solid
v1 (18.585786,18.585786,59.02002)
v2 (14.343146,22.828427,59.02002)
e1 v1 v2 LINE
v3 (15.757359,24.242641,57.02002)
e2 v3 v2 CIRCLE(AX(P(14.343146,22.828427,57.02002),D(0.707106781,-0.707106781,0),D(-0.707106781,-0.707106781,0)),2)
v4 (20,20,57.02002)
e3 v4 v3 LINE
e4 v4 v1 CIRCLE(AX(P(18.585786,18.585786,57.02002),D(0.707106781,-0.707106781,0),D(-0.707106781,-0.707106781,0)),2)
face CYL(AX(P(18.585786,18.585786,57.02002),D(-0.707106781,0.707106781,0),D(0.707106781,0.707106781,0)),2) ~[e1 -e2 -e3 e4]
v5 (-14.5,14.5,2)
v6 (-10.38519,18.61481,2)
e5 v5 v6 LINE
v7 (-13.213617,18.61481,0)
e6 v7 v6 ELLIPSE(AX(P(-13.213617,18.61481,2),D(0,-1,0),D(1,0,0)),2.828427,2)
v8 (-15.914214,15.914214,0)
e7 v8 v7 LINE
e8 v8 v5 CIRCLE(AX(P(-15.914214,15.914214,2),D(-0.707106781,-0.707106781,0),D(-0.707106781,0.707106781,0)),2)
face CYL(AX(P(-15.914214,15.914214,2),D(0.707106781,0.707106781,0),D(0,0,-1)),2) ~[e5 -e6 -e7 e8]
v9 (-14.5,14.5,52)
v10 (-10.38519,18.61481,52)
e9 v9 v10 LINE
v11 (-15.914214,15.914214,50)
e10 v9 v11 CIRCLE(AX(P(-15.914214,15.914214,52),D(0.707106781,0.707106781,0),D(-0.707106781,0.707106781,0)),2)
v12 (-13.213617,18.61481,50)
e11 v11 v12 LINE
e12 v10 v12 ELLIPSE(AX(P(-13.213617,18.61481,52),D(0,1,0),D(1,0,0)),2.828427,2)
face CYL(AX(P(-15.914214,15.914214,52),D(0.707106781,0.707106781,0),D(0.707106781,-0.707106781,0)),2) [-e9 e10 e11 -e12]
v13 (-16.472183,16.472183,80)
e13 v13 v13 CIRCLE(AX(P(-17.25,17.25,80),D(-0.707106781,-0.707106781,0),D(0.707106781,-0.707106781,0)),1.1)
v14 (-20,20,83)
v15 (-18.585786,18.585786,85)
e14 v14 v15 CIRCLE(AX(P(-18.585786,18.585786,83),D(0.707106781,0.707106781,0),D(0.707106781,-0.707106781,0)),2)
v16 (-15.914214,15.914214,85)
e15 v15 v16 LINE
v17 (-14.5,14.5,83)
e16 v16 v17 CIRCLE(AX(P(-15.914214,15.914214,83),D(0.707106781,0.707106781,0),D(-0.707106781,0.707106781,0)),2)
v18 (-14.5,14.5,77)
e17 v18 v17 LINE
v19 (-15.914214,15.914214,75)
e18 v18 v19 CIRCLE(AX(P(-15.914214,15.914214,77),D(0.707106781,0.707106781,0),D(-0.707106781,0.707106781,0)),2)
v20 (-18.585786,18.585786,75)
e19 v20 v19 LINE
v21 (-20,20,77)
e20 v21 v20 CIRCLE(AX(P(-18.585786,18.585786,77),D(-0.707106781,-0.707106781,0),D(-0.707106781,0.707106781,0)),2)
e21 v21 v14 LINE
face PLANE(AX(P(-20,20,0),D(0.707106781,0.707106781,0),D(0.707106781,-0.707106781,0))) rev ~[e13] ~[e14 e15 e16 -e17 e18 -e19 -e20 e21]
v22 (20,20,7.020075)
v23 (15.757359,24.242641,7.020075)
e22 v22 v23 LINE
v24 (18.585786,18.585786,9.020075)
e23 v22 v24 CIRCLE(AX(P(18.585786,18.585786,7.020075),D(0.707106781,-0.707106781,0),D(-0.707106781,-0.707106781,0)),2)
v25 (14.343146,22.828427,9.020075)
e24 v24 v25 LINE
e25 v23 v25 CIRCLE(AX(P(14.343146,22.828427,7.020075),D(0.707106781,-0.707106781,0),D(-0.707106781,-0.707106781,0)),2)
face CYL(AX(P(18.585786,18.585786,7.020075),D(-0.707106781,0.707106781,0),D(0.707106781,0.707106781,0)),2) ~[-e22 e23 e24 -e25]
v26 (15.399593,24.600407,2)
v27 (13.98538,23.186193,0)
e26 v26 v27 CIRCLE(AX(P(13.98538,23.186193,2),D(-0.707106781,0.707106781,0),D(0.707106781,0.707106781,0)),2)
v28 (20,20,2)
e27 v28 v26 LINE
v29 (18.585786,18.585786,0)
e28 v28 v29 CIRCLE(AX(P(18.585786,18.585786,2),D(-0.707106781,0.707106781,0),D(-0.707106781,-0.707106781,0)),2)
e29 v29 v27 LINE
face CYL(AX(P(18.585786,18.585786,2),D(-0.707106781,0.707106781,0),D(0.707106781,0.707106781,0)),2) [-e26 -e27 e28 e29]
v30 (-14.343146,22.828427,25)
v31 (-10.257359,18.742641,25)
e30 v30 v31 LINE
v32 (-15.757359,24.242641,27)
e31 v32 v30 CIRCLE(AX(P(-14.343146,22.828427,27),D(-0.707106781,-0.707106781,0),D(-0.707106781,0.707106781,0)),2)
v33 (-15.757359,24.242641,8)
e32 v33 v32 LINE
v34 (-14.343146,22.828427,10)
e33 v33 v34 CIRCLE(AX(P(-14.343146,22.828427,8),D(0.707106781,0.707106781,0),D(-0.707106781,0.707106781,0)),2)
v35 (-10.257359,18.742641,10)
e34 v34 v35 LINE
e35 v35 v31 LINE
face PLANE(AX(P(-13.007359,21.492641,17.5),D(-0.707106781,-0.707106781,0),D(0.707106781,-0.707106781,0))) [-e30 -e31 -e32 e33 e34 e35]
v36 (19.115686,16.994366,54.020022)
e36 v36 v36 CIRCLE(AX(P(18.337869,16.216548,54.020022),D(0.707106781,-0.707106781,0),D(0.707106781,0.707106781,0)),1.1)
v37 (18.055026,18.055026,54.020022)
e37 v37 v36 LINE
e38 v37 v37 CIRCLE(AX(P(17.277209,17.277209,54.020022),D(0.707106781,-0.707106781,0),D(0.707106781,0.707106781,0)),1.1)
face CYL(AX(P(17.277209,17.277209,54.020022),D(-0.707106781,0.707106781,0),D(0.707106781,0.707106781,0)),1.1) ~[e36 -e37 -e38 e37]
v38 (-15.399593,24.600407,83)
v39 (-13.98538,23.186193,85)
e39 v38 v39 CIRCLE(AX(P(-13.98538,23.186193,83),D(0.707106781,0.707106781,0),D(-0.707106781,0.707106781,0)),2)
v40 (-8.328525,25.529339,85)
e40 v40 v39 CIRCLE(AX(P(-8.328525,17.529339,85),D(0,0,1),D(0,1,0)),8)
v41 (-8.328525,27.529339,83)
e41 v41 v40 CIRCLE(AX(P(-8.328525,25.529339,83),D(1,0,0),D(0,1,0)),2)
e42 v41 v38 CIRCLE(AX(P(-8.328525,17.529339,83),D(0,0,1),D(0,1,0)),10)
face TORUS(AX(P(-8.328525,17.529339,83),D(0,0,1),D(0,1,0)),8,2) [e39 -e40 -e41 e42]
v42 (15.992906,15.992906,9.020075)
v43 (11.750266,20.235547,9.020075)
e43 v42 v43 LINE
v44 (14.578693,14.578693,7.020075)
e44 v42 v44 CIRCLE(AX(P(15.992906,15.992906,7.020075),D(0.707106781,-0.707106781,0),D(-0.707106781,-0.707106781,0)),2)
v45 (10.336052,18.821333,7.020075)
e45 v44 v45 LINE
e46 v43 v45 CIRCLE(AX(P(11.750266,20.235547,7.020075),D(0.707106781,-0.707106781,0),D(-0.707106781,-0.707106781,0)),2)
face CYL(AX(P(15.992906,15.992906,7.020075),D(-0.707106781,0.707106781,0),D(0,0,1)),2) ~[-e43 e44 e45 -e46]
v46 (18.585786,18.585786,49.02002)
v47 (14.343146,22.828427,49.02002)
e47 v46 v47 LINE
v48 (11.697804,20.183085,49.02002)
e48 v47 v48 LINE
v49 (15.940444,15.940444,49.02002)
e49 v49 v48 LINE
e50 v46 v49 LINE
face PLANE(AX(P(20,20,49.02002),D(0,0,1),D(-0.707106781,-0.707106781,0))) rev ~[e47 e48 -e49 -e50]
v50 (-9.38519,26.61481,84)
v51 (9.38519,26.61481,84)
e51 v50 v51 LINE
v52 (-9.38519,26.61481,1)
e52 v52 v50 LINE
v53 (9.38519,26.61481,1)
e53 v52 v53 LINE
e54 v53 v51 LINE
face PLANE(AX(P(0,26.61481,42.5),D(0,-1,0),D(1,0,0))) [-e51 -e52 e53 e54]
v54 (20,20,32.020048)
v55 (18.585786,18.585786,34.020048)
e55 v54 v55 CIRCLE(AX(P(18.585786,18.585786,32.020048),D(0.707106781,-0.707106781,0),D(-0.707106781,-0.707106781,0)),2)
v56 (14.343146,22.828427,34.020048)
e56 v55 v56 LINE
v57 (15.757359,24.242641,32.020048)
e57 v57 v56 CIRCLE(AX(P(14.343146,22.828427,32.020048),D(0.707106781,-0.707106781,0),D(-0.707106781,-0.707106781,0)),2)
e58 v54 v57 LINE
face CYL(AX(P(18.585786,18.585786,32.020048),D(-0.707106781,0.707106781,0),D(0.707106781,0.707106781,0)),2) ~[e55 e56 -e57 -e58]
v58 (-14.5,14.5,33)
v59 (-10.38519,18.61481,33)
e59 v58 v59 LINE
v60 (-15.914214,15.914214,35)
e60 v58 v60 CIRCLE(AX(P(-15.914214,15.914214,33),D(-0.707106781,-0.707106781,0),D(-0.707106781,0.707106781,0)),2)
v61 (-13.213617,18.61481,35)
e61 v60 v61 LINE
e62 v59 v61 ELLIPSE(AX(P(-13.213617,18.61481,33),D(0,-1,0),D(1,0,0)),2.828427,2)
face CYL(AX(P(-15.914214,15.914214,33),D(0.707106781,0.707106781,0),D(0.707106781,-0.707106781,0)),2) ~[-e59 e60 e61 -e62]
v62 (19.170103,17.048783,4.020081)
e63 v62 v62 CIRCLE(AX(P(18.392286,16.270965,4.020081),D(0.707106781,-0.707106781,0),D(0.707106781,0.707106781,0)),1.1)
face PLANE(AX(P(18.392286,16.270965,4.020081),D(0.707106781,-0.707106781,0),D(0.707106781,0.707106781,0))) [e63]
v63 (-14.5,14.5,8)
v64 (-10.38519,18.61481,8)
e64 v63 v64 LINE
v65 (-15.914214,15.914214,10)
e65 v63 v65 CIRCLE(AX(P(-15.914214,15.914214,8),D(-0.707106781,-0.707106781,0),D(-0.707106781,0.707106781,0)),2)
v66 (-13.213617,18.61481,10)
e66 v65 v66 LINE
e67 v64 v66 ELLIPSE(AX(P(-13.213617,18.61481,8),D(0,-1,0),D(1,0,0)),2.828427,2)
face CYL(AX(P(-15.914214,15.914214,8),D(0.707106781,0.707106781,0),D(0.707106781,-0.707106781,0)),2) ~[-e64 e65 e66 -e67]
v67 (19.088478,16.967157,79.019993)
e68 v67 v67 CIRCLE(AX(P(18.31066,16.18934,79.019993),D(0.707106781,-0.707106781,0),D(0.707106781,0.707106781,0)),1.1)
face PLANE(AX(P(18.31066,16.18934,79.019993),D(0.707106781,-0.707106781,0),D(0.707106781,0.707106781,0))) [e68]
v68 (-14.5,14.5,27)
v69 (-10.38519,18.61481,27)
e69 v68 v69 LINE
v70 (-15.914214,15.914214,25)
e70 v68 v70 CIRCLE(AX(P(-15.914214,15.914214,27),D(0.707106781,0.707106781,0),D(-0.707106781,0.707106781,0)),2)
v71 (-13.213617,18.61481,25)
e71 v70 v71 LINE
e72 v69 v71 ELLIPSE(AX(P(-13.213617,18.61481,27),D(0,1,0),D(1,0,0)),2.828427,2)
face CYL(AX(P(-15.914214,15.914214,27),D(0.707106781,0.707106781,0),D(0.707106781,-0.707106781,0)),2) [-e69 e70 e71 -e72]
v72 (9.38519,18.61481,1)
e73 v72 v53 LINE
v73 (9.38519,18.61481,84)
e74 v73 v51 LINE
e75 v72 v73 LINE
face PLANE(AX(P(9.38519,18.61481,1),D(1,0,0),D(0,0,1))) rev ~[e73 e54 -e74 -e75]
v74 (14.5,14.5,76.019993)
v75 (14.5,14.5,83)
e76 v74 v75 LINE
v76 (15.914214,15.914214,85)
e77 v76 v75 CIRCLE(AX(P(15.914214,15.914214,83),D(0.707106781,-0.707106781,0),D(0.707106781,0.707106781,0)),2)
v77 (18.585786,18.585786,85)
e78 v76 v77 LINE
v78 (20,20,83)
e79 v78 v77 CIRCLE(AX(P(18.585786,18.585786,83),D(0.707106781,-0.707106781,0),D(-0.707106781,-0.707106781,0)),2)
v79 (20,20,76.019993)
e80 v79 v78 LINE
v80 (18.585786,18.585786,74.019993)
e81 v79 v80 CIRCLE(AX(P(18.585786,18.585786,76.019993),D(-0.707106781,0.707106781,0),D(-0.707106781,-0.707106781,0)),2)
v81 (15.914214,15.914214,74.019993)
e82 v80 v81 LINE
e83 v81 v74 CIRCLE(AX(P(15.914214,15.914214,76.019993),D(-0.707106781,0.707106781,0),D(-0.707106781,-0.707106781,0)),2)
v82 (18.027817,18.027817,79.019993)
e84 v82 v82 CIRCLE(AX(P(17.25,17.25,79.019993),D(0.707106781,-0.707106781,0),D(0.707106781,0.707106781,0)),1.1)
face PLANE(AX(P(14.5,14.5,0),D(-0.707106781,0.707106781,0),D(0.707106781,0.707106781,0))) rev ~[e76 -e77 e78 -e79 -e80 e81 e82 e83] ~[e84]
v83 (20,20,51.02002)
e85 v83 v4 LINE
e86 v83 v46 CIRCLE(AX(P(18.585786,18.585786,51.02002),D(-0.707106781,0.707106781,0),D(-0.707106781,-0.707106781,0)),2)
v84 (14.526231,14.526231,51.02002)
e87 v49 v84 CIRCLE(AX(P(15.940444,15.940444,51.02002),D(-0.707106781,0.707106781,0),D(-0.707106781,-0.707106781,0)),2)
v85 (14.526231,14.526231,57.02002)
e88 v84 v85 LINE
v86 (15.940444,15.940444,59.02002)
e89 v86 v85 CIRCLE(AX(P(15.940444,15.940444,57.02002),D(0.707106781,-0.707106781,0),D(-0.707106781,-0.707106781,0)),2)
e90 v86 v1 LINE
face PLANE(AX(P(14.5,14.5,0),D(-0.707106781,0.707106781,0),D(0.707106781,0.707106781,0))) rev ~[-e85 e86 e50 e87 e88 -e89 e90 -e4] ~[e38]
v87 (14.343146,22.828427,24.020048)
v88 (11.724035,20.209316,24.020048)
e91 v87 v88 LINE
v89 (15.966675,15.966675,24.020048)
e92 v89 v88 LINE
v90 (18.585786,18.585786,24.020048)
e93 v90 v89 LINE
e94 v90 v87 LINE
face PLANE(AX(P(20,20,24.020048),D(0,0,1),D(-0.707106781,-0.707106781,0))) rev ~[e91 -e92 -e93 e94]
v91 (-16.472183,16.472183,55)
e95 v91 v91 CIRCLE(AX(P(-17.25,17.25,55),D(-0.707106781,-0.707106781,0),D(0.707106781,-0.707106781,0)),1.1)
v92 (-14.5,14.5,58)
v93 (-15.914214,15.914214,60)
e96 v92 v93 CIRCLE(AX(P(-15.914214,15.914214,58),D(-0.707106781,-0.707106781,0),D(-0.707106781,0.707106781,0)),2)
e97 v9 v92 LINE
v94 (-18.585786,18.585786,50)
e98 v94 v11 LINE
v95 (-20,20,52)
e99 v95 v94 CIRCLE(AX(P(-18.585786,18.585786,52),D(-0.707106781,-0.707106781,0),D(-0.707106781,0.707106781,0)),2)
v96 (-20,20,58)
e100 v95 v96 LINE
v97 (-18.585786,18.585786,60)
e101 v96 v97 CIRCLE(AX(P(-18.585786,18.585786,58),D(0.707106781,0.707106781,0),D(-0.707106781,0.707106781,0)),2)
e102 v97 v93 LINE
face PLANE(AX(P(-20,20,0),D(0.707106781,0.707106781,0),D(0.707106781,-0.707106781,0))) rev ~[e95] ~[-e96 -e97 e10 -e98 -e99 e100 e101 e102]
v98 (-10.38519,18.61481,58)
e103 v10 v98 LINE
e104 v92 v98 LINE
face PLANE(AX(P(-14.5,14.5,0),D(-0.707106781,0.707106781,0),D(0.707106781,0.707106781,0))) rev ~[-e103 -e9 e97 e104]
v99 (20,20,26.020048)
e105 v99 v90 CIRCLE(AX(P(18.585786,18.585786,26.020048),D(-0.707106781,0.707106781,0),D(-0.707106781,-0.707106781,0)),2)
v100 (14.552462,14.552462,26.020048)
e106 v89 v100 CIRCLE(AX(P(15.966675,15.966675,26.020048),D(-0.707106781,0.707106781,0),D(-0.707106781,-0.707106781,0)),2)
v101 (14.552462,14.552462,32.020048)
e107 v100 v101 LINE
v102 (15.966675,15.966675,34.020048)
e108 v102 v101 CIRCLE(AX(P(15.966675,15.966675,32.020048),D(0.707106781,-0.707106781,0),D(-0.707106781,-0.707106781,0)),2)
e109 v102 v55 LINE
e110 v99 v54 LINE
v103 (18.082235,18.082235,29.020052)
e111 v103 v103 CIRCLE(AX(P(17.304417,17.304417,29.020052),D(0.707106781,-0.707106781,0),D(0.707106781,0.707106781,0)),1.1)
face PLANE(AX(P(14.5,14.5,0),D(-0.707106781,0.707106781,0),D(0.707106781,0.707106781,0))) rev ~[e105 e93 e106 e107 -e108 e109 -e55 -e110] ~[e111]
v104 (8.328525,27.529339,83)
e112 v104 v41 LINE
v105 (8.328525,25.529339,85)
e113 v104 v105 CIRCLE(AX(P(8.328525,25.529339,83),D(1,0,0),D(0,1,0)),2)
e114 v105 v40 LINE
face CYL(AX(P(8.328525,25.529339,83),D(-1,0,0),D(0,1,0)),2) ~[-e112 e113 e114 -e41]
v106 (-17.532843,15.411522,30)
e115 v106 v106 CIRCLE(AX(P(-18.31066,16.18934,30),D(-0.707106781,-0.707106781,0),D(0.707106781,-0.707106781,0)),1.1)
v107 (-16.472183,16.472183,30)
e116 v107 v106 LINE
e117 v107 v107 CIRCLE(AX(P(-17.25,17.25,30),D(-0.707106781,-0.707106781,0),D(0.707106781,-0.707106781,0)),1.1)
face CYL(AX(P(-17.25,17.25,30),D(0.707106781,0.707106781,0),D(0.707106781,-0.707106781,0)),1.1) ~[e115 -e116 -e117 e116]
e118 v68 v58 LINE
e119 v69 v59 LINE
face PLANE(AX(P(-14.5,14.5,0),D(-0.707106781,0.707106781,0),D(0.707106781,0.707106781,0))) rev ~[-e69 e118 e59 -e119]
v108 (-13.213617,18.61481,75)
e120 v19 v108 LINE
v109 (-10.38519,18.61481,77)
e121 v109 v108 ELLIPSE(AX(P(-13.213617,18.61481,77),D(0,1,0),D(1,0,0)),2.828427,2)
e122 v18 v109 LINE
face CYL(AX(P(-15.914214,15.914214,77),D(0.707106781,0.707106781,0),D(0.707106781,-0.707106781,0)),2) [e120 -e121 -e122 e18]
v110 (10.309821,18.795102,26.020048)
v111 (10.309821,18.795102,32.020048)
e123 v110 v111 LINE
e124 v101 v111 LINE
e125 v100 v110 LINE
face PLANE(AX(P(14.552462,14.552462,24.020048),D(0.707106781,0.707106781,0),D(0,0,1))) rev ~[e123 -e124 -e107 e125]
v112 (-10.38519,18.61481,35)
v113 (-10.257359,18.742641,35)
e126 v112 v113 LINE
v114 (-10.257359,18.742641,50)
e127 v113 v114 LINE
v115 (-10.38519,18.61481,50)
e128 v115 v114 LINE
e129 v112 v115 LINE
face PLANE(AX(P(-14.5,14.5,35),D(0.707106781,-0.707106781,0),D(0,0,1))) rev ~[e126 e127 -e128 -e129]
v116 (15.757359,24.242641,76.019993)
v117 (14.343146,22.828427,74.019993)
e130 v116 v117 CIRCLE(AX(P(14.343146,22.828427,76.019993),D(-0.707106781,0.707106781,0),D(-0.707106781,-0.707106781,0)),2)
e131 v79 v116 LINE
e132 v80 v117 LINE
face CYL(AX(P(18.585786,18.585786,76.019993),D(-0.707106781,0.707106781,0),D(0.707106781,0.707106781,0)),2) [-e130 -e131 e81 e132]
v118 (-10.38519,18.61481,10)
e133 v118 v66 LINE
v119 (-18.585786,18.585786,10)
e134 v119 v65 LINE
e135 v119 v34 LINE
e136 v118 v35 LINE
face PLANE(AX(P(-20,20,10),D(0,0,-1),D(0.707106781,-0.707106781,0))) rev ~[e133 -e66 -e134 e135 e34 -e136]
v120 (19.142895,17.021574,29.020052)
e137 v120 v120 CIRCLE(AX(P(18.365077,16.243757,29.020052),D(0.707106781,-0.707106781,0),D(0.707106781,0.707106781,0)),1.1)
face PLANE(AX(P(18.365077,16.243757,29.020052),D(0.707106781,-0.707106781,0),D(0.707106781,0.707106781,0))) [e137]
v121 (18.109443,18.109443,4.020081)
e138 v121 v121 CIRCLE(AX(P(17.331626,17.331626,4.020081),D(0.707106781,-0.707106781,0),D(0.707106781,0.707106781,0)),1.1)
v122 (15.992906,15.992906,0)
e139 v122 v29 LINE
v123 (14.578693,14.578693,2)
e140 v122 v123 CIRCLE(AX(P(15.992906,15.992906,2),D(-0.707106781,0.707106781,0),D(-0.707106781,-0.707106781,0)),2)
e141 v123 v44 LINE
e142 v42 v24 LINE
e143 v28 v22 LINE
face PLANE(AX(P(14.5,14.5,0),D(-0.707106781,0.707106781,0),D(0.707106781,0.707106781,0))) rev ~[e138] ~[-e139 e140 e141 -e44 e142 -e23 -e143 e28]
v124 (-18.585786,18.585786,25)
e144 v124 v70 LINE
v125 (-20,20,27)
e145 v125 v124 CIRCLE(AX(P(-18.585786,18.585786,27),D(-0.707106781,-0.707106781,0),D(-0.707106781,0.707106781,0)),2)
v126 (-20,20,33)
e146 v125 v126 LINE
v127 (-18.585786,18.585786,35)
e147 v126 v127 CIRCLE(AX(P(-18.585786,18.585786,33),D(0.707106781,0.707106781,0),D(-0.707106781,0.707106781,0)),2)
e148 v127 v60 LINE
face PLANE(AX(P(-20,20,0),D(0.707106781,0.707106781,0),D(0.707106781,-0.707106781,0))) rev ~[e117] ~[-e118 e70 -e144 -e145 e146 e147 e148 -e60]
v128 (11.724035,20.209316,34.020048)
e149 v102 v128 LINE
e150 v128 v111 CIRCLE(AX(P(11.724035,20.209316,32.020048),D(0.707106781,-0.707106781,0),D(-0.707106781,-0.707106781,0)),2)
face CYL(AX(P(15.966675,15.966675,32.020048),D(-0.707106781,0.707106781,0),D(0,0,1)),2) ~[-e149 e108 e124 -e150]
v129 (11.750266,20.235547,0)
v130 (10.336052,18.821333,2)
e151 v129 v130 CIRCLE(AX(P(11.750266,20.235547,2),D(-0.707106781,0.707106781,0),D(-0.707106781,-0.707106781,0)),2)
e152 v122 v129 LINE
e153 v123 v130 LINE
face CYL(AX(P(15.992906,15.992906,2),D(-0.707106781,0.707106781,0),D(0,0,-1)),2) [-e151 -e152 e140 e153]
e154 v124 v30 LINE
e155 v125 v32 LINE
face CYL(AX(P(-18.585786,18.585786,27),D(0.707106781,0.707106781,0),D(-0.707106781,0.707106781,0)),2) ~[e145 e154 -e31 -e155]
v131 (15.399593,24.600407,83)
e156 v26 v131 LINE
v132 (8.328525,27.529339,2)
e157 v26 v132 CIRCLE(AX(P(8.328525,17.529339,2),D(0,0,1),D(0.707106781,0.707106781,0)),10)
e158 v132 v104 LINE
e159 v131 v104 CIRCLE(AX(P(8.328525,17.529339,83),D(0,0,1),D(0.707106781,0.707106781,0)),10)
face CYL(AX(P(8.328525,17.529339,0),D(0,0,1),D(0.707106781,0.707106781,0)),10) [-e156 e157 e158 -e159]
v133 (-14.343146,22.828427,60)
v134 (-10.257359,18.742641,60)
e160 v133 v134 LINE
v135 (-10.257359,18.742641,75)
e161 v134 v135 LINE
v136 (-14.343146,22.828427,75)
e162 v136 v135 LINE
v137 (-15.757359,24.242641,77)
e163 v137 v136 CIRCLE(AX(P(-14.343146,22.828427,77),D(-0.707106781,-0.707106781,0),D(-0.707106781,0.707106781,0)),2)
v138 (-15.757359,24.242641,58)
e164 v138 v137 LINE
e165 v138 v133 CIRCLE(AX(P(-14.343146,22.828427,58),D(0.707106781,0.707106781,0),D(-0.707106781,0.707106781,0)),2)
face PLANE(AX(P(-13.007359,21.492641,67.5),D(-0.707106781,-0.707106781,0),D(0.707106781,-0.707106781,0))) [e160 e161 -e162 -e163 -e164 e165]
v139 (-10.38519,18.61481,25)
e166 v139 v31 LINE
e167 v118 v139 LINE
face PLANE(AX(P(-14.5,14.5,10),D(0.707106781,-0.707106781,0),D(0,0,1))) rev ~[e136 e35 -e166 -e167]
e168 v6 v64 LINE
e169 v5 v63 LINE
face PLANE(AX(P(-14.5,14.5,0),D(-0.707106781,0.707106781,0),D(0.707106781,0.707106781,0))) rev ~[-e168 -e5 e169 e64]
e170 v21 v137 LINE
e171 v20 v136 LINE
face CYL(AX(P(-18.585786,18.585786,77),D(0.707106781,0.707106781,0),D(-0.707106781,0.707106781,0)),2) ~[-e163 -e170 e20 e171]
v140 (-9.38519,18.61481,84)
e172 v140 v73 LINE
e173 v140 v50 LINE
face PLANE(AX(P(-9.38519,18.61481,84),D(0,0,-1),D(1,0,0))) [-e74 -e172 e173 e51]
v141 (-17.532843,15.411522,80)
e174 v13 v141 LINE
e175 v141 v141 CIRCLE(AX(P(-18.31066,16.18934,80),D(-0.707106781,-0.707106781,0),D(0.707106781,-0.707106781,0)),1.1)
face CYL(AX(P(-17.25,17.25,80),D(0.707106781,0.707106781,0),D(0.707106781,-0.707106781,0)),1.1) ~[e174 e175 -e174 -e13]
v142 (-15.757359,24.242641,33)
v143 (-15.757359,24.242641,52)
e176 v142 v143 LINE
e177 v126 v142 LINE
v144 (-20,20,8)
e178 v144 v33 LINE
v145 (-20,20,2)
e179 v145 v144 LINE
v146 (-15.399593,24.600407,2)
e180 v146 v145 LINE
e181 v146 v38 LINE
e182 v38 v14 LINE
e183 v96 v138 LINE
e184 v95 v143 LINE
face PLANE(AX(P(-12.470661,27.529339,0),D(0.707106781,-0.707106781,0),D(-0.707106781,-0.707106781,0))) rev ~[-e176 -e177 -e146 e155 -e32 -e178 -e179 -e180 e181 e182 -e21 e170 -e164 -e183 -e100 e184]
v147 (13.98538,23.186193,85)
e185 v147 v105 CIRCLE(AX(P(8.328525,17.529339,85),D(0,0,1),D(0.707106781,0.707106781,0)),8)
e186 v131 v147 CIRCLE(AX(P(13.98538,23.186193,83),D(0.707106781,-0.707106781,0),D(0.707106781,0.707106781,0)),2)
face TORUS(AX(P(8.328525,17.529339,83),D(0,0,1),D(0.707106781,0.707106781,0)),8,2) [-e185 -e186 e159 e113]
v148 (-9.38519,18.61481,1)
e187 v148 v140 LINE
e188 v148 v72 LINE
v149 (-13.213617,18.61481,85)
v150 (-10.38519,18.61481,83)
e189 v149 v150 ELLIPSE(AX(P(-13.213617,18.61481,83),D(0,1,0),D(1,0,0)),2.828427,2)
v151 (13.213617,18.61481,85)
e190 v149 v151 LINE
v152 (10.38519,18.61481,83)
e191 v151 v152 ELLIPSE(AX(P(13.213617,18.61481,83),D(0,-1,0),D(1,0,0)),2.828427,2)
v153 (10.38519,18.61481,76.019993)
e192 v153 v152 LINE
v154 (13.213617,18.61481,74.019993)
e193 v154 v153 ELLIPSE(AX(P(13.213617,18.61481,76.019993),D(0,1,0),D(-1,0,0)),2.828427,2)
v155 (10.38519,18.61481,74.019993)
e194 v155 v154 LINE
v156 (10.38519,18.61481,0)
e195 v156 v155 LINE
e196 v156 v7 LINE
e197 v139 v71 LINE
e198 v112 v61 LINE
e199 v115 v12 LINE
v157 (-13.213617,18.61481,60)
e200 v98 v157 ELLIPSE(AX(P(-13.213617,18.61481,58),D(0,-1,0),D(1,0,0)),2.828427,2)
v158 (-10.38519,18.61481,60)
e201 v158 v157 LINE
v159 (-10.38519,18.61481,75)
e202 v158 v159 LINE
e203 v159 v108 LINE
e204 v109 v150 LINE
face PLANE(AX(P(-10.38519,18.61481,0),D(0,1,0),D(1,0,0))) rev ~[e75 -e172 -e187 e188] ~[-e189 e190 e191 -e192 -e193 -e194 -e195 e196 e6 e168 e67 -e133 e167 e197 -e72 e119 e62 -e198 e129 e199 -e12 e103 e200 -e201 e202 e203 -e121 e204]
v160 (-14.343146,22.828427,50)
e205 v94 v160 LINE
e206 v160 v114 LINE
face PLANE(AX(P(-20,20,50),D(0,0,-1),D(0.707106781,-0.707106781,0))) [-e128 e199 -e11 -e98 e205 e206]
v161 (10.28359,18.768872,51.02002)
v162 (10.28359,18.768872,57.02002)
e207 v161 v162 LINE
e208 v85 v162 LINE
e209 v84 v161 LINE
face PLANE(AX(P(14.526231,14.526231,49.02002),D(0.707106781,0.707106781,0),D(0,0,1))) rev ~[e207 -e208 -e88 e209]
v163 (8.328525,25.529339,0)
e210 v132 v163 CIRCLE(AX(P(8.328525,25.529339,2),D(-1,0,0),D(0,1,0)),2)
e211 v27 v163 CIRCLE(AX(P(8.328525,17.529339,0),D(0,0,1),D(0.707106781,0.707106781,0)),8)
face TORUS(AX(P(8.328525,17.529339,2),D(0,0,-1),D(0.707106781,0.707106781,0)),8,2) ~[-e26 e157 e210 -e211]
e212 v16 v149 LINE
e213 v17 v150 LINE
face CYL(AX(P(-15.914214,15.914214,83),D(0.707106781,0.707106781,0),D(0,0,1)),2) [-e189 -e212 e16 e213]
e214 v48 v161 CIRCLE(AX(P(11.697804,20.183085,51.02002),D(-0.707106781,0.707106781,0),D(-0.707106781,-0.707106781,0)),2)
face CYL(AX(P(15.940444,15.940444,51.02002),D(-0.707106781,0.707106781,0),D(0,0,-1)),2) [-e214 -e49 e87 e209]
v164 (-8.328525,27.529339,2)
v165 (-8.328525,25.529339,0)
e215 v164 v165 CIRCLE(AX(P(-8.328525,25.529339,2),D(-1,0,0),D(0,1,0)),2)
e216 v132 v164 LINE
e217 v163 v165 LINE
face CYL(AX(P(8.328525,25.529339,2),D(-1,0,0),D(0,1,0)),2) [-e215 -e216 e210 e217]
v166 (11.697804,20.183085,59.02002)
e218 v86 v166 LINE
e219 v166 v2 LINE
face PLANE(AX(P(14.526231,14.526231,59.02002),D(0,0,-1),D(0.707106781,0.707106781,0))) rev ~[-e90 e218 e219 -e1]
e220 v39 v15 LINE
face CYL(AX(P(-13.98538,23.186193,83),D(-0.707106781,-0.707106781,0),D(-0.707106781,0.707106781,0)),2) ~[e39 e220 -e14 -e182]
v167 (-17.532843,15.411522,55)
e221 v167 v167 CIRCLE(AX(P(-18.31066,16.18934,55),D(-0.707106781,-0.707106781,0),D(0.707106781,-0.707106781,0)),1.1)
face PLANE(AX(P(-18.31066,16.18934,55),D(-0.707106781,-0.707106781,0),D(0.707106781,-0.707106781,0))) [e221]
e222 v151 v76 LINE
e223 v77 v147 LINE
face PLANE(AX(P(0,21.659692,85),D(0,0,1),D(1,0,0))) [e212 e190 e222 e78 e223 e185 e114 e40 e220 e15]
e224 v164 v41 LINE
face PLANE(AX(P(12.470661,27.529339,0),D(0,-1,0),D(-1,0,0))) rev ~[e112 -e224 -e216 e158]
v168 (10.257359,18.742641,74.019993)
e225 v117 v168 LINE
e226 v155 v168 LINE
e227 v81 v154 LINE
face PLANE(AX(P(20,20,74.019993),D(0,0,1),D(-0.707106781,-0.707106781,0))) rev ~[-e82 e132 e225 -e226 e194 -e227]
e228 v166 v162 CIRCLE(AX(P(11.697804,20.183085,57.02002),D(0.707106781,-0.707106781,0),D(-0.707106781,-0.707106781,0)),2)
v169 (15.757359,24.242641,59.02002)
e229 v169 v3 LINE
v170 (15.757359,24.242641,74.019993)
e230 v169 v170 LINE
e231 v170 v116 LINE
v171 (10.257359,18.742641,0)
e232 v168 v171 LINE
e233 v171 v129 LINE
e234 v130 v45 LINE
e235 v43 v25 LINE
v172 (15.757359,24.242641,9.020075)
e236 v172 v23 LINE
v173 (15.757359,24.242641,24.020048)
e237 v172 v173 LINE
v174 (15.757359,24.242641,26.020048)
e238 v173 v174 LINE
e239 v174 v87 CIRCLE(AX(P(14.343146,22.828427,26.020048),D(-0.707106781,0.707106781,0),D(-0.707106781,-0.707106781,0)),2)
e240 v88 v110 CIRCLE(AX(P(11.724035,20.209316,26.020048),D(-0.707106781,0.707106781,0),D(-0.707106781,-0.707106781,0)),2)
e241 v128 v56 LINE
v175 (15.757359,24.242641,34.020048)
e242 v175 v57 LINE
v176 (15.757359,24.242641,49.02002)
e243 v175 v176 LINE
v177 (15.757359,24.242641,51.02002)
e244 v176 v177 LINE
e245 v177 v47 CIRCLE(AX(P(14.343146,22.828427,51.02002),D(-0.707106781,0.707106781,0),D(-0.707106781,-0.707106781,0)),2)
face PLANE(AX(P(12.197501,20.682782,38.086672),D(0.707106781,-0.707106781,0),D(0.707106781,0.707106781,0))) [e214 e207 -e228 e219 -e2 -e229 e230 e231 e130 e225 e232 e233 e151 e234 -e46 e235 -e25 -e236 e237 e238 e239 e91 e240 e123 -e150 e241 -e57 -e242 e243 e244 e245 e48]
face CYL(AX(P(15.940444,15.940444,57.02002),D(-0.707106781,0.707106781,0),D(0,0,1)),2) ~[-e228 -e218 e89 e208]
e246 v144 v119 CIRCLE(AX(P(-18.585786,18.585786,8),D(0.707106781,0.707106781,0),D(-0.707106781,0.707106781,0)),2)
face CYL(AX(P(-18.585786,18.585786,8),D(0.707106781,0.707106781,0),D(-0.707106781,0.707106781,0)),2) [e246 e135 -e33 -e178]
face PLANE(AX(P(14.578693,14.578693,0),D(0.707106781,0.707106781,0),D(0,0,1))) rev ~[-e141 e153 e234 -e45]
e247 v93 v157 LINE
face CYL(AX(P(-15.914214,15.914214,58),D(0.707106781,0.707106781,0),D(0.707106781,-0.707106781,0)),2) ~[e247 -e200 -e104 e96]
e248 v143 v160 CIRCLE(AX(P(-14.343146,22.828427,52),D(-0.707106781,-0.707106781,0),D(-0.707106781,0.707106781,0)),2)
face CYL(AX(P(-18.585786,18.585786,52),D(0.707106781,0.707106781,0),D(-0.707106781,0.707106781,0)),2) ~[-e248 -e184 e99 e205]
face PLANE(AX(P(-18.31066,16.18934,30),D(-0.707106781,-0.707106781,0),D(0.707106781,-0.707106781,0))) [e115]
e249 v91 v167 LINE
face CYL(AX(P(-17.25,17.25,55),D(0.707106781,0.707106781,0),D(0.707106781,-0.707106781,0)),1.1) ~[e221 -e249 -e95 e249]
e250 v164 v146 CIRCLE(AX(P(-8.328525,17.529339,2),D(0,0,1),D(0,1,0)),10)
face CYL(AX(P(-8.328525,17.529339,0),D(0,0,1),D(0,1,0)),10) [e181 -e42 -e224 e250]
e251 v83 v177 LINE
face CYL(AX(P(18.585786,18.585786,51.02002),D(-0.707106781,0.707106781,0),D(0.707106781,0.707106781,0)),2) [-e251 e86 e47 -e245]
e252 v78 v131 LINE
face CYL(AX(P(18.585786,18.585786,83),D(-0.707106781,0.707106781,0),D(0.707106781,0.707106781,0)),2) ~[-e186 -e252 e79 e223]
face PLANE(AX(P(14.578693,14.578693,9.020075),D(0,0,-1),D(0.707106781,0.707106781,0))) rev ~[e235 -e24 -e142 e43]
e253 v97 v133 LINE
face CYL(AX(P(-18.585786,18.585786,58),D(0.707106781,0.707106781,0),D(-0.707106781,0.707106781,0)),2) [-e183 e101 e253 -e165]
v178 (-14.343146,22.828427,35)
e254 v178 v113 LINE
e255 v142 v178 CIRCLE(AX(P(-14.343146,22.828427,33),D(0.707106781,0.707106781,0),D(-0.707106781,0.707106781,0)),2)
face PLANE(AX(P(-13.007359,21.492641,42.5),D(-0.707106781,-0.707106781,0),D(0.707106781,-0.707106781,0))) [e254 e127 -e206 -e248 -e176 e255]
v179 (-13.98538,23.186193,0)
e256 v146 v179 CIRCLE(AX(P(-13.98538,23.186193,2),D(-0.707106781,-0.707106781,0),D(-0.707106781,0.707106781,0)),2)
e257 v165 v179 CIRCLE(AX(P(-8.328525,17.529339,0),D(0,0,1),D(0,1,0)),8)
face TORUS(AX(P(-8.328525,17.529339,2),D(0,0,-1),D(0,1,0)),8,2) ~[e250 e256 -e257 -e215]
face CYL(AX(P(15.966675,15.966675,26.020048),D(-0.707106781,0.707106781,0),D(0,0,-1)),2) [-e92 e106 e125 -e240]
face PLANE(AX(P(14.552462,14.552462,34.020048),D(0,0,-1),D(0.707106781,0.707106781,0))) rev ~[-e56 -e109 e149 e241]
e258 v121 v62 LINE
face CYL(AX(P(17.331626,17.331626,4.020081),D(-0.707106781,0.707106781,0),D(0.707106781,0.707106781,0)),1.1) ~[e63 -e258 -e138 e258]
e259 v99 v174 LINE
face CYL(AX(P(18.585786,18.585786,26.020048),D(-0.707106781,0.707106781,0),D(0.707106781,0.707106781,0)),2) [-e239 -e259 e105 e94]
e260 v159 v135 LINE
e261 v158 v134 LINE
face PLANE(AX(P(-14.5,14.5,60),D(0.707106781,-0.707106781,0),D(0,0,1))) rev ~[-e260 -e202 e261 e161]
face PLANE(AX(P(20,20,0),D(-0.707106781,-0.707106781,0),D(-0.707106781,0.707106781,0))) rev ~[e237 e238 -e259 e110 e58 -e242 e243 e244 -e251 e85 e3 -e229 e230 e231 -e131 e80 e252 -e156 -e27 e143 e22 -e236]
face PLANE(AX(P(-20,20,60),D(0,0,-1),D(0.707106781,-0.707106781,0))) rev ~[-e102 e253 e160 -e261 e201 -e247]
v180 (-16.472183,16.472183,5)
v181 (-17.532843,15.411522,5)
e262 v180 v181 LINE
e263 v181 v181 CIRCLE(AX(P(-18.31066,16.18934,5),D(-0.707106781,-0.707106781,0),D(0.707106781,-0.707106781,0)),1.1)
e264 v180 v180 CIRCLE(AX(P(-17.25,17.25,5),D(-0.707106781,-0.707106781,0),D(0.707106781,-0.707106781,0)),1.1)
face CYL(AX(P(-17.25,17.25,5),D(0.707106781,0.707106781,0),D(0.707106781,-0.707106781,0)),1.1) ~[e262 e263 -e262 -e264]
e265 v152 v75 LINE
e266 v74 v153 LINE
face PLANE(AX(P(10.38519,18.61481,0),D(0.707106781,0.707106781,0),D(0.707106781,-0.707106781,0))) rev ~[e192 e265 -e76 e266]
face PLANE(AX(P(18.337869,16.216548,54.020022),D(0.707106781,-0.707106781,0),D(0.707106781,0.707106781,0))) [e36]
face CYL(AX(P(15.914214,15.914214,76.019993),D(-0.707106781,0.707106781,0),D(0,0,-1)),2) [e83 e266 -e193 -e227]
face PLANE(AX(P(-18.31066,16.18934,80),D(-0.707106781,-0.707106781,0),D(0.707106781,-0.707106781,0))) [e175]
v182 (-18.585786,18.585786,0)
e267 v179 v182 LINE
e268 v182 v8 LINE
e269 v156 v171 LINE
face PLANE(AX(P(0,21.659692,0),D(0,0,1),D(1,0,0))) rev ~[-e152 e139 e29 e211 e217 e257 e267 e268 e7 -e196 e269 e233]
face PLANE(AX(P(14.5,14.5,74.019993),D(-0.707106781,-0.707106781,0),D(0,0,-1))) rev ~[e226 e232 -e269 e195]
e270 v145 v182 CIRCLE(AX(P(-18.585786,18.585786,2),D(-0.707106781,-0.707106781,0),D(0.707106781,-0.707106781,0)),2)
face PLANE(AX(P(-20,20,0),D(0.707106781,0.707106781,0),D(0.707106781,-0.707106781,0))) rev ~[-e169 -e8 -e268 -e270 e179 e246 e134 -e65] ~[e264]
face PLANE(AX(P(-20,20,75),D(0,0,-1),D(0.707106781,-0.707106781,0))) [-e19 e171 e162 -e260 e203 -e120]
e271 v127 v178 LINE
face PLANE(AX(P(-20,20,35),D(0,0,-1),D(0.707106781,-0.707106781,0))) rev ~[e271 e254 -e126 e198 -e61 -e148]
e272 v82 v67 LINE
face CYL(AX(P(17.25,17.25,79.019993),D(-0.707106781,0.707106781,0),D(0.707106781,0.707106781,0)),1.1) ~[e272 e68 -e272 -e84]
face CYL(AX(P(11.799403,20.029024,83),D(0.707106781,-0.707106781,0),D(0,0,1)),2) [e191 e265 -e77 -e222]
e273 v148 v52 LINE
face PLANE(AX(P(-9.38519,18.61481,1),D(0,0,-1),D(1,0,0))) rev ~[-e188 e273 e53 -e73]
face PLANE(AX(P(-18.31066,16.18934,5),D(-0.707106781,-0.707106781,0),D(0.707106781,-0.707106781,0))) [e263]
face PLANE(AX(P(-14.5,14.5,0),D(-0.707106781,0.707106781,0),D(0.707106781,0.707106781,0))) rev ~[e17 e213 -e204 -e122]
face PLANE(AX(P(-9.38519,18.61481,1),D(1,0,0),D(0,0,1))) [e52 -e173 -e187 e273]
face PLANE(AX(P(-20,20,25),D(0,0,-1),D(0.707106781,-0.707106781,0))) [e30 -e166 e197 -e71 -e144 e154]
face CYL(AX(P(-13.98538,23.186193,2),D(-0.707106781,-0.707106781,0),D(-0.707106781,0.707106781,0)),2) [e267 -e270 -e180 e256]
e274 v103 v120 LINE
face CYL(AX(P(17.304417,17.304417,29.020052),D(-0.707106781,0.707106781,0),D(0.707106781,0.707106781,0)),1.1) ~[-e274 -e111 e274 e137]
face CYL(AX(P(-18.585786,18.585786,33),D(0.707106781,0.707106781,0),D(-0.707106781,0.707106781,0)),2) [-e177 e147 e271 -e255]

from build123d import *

# Parameters (mm, degrees)
F1_DEPTH  = 85
F2_R      = 10
F4_DEPTH  = 6
F5_R      = 2
F6_W      = 7.7781745931
F6_H      = 15
F7_DEPTH  = 6
F8_R      = 2
F6_R      = 1.1
F9_DEPTH  = 1.5
F3_R      = 1.1
F10_DEPTH = 1.5
F11_W     = 18.7703792453
F11_H     = 83
F12_DEPTH = 8


with BuildPart() as f1:
    # F0 (on Top) → F1 (new body)
    with BuildSketch(Plane.XY):
        Polygon((-20, 20), (-14.5, 14.5), (-10.3851896226, 18.6148103774), (0, 18.6148103774), (10.3851896226, 18.6148103774), (14.5, 14.5), (20, 20), (12.470660899, 27.529339101), (0, 27.529339101), (-12.470660899, 27.529339101), align=None)
    extrude(amount=F1_DEPTH)

    # F2
    f2_edges = [f1.edges().sort_by_distance(p)[0] for p in [
        (-12.470661, 27.529339, 42.5),
        (12.470661, 27.529339, 42.5),
    ]]
    fillet(f2_edges, radius=F2_R)

    # F3 (on face) → F4 (cut)
    with BuildSketch(Plane(origin=(0, 0, 0), x_dir=(0.7071067812, 0.7071067812, 0), z_dir=(0.7071067812, -0.7071067812, 0))):
        Polygon((28.2842712475, 59.0200200677), (28.2842712475, 74.0199925453), (20.5060966544, 74.0199925453), (20.5060966544, 0), (20.6173848753, 0), (20.6173848753, 9.0200751125), (28.2842712475, 9.0200751125), (28.2842712475, 24.0200475901), (20.5802888017, 24.0200475901), (20.5802888017, 34.0200475901), (28.2842712475, 34.0200475901), (28.2842712475, 49.0200200677), (20.543192728, 49.0200200677), (20.543192728, 59.0200200677), align=None)
    extrude(amount=-F4_DEPTH, mode=Mode.SUBTRACT)

    # F5
    f5_edges = [f1.edges().sort_by_distance(p)[0] for p in [
        (17.87868, 22.12132, 74.019993),
        (17.87868, 22.12132, 49.02002),
        (17.87868, 22.12132, 24.020048),
        (17.699797, 22.300203, 0),
        (12.457372, 16.700013, 0),
        (12.431141, 16.673782, 24.020048),
        (12.404911, 16.647551, 49.02002),
        (17.699797, 22.300203, 85),
        (12.442595, 16.557405, 85),
        (17.87868, 22.12132, 59.02002),
        (12.404911, 16.647551, 59.02002),
        (17.87868, 22.12132, 34.020048),
        (12.431141, 16.673782, 34.020048),
        (17.87868, 22.12132, 9.020075),
        (12.457372, 16.700013, 9.020075),
        (-17.699797, 22.300203, 0),
        (-17.699797, 22.300203, 85),
        (-12.15536, 26.768134, 0),
        (0, 27.529339, 0),
        (12.15536, 26.768134, 0),
        (-12.442595, 16.557405, 0),
        (-12.15536, 26.768134, 85),
        (0, 27.529339, 85),
        (-12.442595, 16.557405, 85),
        (12.15536, 26.768134, 85),
        (12.442595, 16.557405, 74.019993),
    ]]
    fillet(f5_edges, radius=F5_R)

    # F6 (on face) → F7 (cut)
    with BuildSketch(Plane(origin=(0, 0, 0), x_dir=(0.7071067812, -0.7071067812, 0), z_dir=(-0.7071067812, -0.7071067812, 0))):
        with Locations((-24.3951839509, 17.5)):
            Rectangle(F6_W, F6_H)
        with Locations((-24.3951839509, 42.5)):
            Rectangle(F6_W, F6_H)
        with Locations((-24.3951839509, 67.5)):
            Rectangle(F6_W, F6_H)
    extrude(amount=-F7_DEPTH, mode=Mode.SUBTRACT)

    # F8
    f8_edges = [f1.edges().sort_by_distance(p)[0] for p in [
        (-17.87868, 22.12132, 35),
        (-17.87868, 22.12132, 50),
        (-17.87868, 22.12132, 60),
        (-17.87868, 22.12132, 75),
        (-12.442595, 16.557405, 75),
        (-12.442595, 16.557405, 60),
        (-12.442595, 16.557405, 50),
        (-12.442595, 16.557405, 35),
        (-12.442595, 16.557405, 25),
        (-12.442595, 16.557405, 10),
        (-17.87868, 22.12132, 10),
        (-17.87868, 22.12132, 25),
    ]]
    fillet(f8_edges, radius=F8_R)

    # F6 (on face) → F9 (join)
    with BuildSketch(Plane(origin=(0, 0, 0), x_dir=(0.7071067812, -0.7071067812, 0), z_dir=(-0.7071067812, -0.7071067812, 0))):
        with Locations((-24.3951839509, 5)):
            Circle(F6_R)
        with Locations((-24.3951839509, 30)):
            Circle(F6_R)
        with Locations((-24.3951839509, 55)):
            Circle(F6_R)
        with Locations((-24.3951839509, 80)):
            Circle(F6_R)
    extrude(amount=F9_DEPTH)

    # F3 (on face) → F10 (join)
    with BuildSketch(Plane(origin=(0, 0, 0), x_dir=(0.7071067812, 0.7071067812, 0), z_dir=(0.7071067812, -0.7071067812, 0))):
        with Locations((24.3951839509, 79.0199925453)):
            Circle(F3_R)
        with Locations((24.4336626312, 54.0200221575)):
            Circle(F3_R)
        with Locations((24.4721413114, 29.0200517697)):
            Circle(F3_R)
        with Locations((24.5106199916, 4.0200813819)):
            Circle(F3_R)
    extrude(amount=F10_DEPTH)

    # F11 (on face) → F12 (cut)
    with BuildSketch(Plane.XZ.offset(-18.6148103774)):
        with Locations((0, 42.5)):
            Rectangle(F11_W, F11_H)
    extrude(amount=-F12_DEPTH, mode=Mode.SUBTRACT)


solid = f1.part
